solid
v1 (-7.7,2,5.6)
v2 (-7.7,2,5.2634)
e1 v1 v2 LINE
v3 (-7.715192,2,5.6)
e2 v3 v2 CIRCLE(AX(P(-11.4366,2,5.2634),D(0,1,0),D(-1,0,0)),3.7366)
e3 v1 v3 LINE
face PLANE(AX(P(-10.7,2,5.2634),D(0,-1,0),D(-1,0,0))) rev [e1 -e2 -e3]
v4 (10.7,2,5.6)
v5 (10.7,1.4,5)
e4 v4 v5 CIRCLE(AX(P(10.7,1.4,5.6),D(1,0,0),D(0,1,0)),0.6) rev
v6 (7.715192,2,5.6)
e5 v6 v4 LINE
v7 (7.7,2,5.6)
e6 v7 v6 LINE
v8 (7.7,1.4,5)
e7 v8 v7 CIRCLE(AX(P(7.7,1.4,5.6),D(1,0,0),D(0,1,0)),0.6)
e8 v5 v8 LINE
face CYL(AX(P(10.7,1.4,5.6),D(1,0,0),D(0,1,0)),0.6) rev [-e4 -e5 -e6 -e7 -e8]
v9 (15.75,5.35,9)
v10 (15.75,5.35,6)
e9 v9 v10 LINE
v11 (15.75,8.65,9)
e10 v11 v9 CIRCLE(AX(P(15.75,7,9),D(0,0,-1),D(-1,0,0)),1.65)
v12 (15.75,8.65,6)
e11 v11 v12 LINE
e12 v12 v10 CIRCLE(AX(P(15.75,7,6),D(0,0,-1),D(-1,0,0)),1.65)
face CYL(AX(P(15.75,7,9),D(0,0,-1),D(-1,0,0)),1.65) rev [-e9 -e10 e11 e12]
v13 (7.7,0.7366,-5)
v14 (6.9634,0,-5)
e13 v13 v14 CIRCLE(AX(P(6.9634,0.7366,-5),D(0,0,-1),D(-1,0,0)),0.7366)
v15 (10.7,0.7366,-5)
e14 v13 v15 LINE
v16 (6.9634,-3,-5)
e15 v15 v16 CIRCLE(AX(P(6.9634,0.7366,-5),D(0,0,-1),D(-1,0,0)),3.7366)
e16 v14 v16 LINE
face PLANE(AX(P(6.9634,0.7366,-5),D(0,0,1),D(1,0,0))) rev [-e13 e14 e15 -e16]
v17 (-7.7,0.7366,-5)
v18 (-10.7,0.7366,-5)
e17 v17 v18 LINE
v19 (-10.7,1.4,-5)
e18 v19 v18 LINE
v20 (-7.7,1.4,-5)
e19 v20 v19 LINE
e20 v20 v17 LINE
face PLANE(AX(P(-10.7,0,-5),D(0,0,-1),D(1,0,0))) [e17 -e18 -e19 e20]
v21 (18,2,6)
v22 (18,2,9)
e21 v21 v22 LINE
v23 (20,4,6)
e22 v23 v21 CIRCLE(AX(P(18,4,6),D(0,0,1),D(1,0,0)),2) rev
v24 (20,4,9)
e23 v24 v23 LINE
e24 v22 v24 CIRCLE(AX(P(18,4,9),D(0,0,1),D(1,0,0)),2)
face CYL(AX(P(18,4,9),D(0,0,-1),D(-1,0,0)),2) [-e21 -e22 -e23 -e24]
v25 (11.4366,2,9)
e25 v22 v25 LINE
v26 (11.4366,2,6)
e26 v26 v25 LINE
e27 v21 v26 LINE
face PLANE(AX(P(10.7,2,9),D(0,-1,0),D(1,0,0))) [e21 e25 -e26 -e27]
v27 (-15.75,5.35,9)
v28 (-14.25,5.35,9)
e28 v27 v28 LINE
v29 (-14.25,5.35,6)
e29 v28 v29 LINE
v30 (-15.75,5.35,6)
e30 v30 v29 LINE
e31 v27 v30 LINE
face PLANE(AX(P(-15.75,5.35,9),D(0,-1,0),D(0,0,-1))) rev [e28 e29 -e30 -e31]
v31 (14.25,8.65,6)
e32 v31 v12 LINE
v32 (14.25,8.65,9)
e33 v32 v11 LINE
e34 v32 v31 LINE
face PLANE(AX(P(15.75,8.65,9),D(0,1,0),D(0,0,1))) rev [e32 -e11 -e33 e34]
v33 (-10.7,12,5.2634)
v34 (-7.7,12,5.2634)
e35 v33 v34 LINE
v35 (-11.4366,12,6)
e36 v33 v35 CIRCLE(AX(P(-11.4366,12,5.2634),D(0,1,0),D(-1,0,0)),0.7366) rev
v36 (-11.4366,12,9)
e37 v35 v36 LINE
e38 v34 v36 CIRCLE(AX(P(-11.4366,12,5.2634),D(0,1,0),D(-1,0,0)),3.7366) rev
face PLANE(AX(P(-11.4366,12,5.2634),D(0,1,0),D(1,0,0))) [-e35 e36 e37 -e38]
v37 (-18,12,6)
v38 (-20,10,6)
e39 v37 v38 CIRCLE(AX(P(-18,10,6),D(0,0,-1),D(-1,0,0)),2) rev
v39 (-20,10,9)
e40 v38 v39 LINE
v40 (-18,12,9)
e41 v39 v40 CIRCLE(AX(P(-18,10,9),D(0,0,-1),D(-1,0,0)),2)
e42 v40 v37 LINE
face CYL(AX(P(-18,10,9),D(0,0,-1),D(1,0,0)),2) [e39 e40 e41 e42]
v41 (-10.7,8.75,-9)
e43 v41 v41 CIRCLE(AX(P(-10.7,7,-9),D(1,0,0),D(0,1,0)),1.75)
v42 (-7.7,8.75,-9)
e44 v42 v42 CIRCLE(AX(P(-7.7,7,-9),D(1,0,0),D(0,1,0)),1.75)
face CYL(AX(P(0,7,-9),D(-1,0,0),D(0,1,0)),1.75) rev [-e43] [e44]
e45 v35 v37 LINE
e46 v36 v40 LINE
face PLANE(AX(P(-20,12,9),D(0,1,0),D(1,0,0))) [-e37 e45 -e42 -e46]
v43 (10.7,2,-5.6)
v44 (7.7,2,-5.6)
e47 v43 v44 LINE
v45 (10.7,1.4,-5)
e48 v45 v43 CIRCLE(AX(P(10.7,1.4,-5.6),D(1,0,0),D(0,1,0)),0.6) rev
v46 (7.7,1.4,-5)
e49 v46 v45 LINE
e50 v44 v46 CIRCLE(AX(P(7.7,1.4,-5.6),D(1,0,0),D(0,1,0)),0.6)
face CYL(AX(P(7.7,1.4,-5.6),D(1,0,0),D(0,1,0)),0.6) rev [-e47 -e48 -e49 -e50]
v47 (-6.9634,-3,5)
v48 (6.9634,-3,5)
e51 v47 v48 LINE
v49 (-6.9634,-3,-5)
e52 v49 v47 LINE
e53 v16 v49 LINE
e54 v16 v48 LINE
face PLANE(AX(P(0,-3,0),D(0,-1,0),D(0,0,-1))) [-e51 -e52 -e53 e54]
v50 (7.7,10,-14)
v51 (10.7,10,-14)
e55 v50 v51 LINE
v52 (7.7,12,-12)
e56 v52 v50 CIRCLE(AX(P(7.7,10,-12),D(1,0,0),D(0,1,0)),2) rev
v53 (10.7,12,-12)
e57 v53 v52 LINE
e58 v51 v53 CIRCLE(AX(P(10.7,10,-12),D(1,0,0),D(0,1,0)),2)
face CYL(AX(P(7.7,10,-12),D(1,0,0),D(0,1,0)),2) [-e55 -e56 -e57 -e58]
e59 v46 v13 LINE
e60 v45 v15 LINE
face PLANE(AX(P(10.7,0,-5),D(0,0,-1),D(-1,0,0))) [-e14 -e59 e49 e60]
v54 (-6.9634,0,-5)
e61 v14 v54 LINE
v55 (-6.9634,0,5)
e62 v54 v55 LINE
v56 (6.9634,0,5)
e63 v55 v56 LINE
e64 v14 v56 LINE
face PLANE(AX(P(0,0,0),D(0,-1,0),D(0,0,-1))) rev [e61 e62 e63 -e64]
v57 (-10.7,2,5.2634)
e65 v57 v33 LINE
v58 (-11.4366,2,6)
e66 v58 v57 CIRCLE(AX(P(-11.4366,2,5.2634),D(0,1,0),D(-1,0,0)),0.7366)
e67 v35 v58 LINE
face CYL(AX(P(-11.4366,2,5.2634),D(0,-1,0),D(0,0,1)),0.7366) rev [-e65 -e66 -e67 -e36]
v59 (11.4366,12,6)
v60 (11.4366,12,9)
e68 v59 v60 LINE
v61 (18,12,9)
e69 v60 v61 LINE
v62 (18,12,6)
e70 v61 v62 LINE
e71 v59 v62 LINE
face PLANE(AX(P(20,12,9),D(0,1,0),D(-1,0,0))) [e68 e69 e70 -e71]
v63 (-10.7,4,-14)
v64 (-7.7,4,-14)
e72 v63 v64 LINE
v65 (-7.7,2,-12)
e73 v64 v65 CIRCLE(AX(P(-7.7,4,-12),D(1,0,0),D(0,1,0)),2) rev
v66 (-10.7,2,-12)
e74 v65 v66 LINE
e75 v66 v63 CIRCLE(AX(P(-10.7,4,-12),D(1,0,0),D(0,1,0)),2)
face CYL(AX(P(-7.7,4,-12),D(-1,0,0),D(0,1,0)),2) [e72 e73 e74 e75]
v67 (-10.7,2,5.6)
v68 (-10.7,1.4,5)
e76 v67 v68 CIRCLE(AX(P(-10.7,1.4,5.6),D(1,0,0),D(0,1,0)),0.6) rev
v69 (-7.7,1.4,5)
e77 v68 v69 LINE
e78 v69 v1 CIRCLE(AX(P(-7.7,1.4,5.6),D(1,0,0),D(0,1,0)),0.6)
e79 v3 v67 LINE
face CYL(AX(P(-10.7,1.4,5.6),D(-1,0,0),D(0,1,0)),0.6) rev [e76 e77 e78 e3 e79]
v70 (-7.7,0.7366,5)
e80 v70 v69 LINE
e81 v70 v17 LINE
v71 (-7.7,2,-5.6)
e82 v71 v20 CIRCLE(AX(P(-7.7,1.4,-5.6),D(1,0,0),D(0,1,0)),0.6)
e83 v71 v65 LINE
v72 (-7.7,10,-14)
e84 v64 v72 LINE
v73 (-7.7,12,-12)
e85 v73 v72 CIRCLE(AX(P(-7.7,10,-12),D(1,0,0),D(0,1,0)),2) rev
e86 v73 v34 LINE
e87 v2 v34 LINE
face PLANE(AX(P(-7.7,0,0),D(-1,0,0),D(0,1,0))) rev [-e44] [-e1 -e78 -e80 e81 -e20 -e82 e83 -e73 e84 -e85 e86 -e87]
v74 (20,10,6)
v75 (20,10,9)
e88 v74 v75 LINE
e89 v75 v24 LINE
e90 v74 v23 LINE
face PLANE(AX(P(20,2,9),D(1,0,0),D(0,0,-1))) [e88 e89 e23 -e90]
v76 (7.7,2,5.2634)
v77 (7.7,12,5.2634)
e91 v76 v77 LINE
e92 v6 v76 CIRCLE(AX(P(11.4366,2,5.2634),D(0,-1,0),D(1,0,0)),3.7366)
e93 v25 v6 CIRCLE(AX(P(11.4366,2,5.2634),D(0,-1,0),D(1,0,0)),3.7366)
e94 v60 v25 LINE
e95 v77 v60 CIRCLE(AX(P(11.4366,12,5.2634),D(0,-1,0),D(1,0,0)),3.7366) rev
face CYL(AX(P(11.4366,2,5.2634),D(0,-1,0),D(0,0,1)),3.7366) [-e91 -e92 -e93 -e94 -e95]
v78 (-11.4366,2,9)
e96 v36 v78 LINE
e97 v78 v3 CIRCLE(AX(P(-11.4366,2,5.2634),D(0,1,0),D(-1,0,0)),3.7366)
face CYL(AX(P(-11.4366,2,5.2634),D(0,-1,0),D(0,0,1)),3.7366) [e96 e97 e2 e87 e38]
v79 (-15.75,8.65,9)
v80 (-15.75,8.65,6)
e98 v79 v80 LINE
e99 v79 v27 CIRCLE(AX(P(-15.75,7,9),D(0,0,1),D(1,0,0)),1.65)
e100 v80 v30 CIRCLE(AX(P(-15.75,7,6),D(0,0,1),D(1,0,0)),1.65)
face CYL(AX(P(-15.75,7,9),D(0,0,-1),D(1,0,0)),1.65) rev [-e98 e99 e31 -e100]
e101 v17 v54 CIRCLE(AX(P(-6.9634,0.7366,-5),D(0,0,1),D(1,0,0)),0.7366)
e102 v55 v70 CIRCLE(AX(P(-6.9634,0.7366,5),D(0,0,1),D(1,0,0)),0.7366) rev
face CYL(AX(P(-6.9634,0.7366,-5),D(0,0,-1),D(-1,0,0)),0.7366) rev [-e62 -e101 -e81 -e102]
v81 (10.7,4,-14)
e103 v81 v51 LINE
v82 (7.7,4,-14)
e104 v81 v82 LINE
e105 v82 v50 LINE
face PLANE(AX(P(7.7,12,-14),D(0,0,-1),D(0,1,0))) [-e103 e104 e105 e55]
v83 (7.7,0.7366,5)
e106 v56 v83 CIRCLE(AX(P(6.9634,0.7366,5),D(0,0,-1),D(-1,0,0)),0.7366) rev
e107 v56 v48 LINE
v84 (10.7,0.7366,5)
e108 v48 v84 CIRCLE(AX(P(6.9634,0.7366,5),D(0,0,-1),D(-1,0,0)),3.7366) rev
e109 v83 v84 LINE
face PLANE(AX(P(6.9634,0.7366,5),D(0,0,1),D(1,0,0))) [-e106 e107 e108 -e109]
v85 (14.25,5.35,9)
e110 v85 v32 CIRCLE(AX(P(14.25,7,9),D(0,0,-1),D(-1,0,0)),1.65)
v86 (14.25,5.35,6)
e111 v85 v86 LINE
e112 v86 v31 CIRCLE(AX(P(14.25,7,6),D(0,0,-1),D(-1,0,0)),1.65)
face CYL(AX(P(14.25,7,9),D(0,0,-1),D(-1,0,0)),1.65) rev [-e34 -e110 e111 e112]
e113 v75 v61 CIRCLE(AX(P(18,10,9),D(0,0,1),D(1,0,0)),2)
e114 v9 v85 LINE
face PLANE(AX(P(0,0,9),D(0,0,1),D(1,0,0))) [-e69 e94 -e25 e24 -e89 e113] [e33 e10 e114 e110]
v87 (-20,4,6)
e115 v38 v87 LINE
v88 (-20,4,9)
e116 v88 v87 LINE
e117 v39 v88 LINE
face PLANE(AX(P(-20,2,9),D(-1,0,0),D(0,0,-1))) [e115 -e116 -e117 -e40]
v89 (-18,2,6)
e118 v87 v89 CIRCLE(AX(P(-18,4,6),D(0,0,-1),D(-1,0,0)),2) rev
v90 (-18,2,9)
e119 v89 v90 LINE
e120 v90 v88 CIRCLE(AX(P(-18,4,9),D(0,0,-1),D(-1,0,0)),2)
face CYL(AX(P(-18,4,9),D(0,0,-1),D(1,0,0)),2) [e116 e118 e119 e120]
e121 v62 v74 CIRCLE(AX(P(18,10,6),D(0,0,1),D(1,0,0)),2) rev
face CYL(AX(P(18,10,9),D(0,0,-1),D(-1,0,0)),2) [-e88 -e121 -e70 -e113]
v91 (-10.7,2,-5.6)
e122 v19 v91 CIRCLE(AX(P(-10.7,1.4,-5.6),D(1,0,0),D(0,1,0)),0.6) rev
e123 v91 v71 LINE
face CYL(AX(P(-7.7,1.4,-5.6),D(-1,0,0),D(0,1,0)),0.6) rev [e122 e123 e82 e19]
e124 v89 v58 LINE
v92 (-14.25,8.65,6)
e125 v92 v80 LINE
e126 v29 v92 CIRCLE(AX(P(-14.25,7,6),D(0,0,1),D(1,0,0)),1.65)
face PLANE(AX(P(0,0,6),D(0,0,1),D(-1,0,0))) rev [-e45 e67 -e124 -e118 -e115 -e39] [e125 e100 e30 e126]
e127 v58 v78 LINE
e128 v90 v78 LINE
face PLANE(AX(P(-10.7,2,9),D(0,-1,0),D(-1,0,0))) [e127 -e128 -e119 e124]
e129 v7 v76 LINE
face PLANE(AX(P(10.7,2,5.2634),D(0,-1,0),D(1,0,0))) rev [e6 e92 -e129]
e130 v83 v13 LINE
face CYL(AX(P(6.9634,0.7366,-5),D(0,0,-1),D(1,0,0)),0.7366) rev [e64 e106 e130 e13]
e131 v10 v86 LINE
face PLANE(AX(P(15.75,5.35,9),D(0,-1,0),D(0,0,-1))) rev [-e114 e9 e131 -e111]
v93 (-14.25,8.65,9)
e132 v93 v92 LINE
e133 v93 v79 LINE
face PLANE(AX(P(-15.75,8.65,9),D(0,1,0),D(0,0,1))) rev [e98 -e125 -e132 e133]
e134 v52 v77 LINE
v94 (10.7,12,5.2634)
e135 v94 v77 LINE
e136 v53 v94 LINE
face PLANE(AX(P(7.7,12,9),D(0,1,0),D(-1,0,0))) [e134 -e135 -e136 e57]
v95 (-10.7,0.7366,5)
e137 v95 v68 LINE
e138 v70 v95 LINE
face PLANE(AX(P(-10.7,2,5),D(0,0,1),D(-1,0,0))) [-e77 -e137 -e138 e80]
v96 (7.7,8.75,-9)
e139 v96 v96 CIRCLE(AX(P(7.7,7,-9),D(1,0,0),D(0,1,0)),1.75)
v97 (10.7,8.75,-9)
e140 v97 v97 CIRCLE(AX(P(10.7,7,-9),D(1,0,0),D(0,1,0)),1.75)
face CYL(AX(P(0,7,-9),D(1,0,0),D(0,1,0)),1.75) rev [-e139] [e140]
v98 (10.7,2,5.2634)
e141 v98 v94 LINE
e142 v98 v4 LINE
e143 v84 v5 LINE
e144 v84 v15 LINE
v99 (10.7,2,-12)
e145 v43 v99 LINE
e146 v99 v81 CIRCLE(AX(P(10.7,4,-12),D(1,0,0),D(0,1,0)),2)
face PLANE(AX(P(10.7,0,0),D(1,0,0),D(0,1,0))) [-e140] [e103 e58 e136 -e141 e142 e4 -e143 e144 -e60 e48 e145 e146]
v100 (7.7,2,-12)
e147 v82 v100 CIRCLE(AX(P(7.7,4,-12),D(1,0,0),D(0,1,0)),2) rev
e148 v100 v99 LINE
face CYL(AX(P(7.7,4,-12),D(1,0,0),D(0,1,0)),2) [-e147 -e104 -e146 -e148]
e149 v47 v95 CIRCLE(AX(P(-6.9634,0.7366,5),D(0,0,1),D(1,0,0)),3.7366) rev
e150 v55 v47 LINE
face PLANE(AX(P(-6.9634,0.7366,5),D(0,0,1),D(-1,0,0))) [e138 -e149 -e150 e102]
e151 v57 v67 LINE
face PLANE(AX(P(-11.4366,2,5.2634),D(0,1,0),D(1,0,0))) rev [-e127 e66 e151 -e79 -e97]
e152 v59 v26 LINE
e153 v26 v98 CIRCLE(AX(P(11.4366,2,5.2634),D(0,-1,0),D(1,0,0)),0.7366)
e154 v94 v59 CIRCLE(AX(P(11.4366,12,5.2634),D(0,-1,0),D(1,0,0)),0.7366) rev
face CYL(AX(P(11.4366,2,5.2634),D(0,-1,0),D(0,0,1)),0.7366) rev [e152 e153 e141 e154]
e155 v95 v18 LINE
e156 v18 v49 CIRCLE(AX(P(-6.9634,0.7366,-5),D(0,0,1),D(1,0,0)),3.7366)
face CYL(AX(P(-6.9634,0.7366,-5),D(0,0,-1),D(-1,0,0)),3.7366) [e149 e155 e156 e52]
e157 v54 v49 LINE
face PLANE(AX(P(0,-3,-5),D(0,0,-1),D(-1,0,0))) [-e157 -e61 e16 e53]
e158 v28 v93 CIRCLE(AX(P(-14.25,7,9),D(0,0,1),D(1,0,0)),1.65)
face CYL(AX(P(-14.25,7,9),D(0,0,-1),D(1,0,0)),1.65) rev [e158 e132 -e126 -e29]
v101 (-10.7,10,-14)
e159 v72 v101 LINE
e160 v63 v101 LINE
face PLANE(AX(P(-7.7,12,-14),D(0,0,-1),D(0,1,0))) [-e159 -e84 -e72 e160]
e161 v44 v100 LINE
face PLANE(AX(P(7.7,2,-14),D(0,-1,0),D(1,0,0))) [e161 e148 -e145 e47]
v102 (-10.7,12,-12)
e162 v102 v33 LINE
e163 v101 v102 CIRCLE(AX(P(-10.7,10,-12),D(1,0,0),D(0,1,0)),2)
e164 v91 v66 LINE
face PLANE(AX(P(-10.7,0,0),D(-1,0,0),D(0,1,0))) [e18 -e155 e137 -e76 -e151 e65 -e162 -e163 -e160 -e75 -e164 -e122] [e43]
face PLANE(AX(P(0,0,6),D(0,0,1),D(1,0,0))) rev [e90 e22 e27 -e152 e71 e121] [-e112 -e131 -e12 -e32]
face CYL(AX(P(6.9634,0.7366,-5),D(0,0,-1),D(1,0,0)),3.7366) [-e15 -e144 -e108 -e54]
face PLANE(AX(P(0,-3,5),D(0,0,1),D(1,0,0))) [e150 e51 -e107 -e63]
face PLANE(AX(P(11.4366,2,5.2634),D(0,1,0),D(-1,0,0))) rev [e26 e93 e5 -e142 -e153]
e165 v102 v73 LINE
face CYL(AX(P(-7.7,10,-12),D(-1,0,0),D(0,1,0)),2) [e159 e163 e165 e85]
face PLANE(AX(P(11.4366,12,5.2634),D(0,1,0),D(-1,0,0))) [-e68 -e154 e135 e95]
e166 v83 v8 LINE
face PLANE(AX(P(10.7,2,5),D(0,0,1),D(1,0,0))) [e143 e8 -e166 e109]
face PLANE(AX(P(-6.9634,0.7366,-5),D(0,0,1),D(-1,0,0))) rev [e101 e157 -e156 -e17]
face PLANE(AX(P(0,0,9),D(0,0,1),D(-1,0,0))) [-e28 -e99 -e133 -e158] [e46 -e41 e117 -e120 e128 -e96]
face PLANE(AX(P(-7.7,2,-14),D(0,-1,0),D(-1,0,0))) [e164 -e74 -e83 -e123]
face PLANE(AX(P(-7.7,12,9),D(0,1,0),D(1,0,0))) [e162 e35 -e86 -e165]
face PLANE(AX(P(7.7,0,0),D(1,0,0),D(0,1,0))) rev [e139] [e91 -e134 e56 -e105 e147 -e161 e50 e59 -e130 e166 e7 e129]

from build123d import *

# Parameters (mm, degrees)
SKETCH1_W                    = 7.7
SKETCH1_H                    = 10
BASE_FLANGE1_DEPTH           = 3
EDGE_FLANGE1_STRIP_W         = 13.4732
EDGE_FLANGE1_STRIP_H         = 3
EDGE_FLANGE1_STRIP_CUT_DEPTH = 10
EDGE_FLANGE1_DEPTH           = 10
TAB1_START                   = -3
TAB1_OUTLINE_W               = 23
TAB1_OUTLINE_H               = 10
TAB1_DEPTH                   = 3
FILLET1_R                    = 0.6
FILLET2_R                    = 2
SKETCH15_R                   = 1.75
CUT_EXTRUDE1_DEPTH           = 22.318771072
EDGE_FLANGE2_START           = 2
EDGE_FLANGE2_DEPTH           = 10
EDGE_FLANGE2_2_DEPTH         = 10
CUT_EXTRUDE2_DEPTH           = 31.724582991
FILLET3_R                    = 2


# Read off the part's stored shape, not the designer's step: Tab1, Edge-Flange2
# Sheet-metal steps are written as plain solids
with BuildPart() as part:
    # Sketch1 → Base-Flange1 (new body)
    with BuildSketch(Plane(origin=(0, 0, 0), x_dir=(1, 0, 0), z_dir=(0, 1, 0))):
        with Locations((3.85, 0)):
            Rectangle(SKETCH1_W, SKETCH1_H)
    extrude(amount=-BASE_FLANGE1_DEPTH)

    # Edge-Flange1 strip (across the edge) → Edge-Flange1 strip cut (cut)
    with BuildSketch(Plane(origin=(7.7, 0, 5), x_dir=(-1, 0, 0), z_dir=(0, 0, -1))):
        with Locations((-6, -1.5)):
            Rectangle(EDGE_FLANGE1_STRIP_W, EDGE_FLANGE1_STRIP_H)
    extrude(amount=EDGE_FLANGE1_STRIP_CUT_DEPTH, mode=Mode.SUBTRACT)

    # Edge-Flange1 section (across the edge) → Edge-Flange1 (add)
    with BuildSketch(Plane(origin=(7.7, 0, 5), x_dir=(-1, 0, 0), z_dir=(0, 0, -1))):
        with BuildLine():
            Line((-3, 0.7366), (-3, 2))
            Line((-3, 2), (0, 2))
            Line((0, 2), (0, 0.7366))
            ThreePointArc((0, 0.7366), (0.215745145, 0.215745145), (0.7366, 0))
            Line((0.7366, 0), (0.7366, -3))
            ThreePointArc((0.7366, -3), (-1.905575199, -1.905575199), (-3, 0.7366))
        make_face()
    extrude(amount=EDGE_FLANGE1_DEPTH)

    # Tab1 outline → Tab1 (add)
    with BuildSketch(Plane(origin=(10.7, 0, 0), x_dir=(0, 0, -1), z_dir=(1, 0, 0)).offset(TAB1_START)):
        with Locations((2.5, 7)):
            Rectangle(TAB1_OUTLINE_W, TAB1_OUTLINE_H)
    extrude(amount=TAB1_DEPTH)

    # Fillet1
    fillet1_edges = [part.edges().sort_by_distance(p)[0] for p in [
        (9.2, 2, 5),
        (9.2, 2, -5),
    ]]
    fillet(fillet1_edges, radius=FILLET1_R)

    # Fillet2
    fillet2_edges = [part.edges().sort_by_distance(p)[0] for p in [
        (9.2, 12, -14),
        (9.2, 2, -14),
    ]]
    fillet(fillet2_edges, radius=FILLET2_R)

    # Sketch15 → Cut-Extrude1 (cut, through all)
    with BuildSketch(Plane(origin=(10.7, 0, 0), x_dir=(0, 0, -1), z_dir=(1, 0, 0))):
        with Locations(Location((9, 7, 0), (0, 0, 90))):
            Circle(SKETCH15_R)
    extrude(amount=-CUT_EXTRUDE1_DEPTH, mode=Mode.SUBTRACT)

    # Edge-Flange2 outline → Edge-Flange2 (cut)
    with BuildSketch(Plane(origin=(0, 0, 0), x_dir=(1, 0, 0), z_dir=(0, 1, 0)).offset(EDGE_FLANGE2_START)):
        with BuildLine():
            Line((10.7, -9), (10.7, -8.926677222))
            ThreePointArc((10.7, -8.926677222), (8.545704021, -7.630867001), (7.7, -5.2634))
            Line((7.7, -5.2634), (7.7, -9))
            Line((7.7, -9), (10.7, -9))
        make_face()
    extrude(amount=EDGE_FLANGE2_DEPTH, mode=Mode.SUBTRACT)

    # Edge-Flange2 2 outline → Edge-Flange2 2 (add)
    with BuildSketch(Plane(origin=(0, 0, 0), x_dir=(1, 0, 0), z_dir=(0, 1, 0)).offset(EDGE_FLANGE2_START)):
        with BuildLine():
            ThreePointArc((10.7, -8.926677222), (11.06647982, -8.981624121), (11.4366, -9))
            Line((11.4366, -9), (20, -9))
            Line((20, -9), (20, -6))
            Line((20, -6), (11.4366, -6))
            ThreePointArc((11.4366, -6), (10.915745145, -5.784254855), (10.7, -5.2634))
            Line((10.7, -5.2634), (10.7, -8.926677222))
        make_face()
    extrude(amount=EDGE_FLANGE2_2_DEPTH)

    # Sketch23 → Cut-Extrude2 (cut, through all)
    with BuildSketch(Plane(origin=(0, 0, 6), x_dir=(-1, 0, 0), z_dir=(0, 0, -1))):
        with BuildLine():
            Line((-15.75, 8.65), (-14.25, 8.65))
            ThreePointArc((-14.25, 8.65), (-12.6, 7), (-14.25, 5.35))
            Line((-14.25, 5.35), (-15.75, 5.35))
            ThreePointArc((-15.75, 5.35), (-17.4, 7), (-15.75, 8.65))
        make_face()
    extrude(amount=-CUT_EXTRUDE2_DEPTH, mode=Mode.SUBTRACT)

    # Fillet3
    fillet3_edges = [part.edges().sort_by_distance(p)[0] for p in [
        (20, 12, 7.5),
        (20, 2, 7.5),
    ]]
    fillet(fillet3_edges, radius=FILLET3_R)

    # Mirror1: part across plane


with BuildPart() as part_1:
    add(part.part)
    add(part.part.mirror(Plane(origin=(0, -3, -5), x_dir=(0, 0, 1), z_dir=(-1, 0, 0))))


solid = part_1.part
